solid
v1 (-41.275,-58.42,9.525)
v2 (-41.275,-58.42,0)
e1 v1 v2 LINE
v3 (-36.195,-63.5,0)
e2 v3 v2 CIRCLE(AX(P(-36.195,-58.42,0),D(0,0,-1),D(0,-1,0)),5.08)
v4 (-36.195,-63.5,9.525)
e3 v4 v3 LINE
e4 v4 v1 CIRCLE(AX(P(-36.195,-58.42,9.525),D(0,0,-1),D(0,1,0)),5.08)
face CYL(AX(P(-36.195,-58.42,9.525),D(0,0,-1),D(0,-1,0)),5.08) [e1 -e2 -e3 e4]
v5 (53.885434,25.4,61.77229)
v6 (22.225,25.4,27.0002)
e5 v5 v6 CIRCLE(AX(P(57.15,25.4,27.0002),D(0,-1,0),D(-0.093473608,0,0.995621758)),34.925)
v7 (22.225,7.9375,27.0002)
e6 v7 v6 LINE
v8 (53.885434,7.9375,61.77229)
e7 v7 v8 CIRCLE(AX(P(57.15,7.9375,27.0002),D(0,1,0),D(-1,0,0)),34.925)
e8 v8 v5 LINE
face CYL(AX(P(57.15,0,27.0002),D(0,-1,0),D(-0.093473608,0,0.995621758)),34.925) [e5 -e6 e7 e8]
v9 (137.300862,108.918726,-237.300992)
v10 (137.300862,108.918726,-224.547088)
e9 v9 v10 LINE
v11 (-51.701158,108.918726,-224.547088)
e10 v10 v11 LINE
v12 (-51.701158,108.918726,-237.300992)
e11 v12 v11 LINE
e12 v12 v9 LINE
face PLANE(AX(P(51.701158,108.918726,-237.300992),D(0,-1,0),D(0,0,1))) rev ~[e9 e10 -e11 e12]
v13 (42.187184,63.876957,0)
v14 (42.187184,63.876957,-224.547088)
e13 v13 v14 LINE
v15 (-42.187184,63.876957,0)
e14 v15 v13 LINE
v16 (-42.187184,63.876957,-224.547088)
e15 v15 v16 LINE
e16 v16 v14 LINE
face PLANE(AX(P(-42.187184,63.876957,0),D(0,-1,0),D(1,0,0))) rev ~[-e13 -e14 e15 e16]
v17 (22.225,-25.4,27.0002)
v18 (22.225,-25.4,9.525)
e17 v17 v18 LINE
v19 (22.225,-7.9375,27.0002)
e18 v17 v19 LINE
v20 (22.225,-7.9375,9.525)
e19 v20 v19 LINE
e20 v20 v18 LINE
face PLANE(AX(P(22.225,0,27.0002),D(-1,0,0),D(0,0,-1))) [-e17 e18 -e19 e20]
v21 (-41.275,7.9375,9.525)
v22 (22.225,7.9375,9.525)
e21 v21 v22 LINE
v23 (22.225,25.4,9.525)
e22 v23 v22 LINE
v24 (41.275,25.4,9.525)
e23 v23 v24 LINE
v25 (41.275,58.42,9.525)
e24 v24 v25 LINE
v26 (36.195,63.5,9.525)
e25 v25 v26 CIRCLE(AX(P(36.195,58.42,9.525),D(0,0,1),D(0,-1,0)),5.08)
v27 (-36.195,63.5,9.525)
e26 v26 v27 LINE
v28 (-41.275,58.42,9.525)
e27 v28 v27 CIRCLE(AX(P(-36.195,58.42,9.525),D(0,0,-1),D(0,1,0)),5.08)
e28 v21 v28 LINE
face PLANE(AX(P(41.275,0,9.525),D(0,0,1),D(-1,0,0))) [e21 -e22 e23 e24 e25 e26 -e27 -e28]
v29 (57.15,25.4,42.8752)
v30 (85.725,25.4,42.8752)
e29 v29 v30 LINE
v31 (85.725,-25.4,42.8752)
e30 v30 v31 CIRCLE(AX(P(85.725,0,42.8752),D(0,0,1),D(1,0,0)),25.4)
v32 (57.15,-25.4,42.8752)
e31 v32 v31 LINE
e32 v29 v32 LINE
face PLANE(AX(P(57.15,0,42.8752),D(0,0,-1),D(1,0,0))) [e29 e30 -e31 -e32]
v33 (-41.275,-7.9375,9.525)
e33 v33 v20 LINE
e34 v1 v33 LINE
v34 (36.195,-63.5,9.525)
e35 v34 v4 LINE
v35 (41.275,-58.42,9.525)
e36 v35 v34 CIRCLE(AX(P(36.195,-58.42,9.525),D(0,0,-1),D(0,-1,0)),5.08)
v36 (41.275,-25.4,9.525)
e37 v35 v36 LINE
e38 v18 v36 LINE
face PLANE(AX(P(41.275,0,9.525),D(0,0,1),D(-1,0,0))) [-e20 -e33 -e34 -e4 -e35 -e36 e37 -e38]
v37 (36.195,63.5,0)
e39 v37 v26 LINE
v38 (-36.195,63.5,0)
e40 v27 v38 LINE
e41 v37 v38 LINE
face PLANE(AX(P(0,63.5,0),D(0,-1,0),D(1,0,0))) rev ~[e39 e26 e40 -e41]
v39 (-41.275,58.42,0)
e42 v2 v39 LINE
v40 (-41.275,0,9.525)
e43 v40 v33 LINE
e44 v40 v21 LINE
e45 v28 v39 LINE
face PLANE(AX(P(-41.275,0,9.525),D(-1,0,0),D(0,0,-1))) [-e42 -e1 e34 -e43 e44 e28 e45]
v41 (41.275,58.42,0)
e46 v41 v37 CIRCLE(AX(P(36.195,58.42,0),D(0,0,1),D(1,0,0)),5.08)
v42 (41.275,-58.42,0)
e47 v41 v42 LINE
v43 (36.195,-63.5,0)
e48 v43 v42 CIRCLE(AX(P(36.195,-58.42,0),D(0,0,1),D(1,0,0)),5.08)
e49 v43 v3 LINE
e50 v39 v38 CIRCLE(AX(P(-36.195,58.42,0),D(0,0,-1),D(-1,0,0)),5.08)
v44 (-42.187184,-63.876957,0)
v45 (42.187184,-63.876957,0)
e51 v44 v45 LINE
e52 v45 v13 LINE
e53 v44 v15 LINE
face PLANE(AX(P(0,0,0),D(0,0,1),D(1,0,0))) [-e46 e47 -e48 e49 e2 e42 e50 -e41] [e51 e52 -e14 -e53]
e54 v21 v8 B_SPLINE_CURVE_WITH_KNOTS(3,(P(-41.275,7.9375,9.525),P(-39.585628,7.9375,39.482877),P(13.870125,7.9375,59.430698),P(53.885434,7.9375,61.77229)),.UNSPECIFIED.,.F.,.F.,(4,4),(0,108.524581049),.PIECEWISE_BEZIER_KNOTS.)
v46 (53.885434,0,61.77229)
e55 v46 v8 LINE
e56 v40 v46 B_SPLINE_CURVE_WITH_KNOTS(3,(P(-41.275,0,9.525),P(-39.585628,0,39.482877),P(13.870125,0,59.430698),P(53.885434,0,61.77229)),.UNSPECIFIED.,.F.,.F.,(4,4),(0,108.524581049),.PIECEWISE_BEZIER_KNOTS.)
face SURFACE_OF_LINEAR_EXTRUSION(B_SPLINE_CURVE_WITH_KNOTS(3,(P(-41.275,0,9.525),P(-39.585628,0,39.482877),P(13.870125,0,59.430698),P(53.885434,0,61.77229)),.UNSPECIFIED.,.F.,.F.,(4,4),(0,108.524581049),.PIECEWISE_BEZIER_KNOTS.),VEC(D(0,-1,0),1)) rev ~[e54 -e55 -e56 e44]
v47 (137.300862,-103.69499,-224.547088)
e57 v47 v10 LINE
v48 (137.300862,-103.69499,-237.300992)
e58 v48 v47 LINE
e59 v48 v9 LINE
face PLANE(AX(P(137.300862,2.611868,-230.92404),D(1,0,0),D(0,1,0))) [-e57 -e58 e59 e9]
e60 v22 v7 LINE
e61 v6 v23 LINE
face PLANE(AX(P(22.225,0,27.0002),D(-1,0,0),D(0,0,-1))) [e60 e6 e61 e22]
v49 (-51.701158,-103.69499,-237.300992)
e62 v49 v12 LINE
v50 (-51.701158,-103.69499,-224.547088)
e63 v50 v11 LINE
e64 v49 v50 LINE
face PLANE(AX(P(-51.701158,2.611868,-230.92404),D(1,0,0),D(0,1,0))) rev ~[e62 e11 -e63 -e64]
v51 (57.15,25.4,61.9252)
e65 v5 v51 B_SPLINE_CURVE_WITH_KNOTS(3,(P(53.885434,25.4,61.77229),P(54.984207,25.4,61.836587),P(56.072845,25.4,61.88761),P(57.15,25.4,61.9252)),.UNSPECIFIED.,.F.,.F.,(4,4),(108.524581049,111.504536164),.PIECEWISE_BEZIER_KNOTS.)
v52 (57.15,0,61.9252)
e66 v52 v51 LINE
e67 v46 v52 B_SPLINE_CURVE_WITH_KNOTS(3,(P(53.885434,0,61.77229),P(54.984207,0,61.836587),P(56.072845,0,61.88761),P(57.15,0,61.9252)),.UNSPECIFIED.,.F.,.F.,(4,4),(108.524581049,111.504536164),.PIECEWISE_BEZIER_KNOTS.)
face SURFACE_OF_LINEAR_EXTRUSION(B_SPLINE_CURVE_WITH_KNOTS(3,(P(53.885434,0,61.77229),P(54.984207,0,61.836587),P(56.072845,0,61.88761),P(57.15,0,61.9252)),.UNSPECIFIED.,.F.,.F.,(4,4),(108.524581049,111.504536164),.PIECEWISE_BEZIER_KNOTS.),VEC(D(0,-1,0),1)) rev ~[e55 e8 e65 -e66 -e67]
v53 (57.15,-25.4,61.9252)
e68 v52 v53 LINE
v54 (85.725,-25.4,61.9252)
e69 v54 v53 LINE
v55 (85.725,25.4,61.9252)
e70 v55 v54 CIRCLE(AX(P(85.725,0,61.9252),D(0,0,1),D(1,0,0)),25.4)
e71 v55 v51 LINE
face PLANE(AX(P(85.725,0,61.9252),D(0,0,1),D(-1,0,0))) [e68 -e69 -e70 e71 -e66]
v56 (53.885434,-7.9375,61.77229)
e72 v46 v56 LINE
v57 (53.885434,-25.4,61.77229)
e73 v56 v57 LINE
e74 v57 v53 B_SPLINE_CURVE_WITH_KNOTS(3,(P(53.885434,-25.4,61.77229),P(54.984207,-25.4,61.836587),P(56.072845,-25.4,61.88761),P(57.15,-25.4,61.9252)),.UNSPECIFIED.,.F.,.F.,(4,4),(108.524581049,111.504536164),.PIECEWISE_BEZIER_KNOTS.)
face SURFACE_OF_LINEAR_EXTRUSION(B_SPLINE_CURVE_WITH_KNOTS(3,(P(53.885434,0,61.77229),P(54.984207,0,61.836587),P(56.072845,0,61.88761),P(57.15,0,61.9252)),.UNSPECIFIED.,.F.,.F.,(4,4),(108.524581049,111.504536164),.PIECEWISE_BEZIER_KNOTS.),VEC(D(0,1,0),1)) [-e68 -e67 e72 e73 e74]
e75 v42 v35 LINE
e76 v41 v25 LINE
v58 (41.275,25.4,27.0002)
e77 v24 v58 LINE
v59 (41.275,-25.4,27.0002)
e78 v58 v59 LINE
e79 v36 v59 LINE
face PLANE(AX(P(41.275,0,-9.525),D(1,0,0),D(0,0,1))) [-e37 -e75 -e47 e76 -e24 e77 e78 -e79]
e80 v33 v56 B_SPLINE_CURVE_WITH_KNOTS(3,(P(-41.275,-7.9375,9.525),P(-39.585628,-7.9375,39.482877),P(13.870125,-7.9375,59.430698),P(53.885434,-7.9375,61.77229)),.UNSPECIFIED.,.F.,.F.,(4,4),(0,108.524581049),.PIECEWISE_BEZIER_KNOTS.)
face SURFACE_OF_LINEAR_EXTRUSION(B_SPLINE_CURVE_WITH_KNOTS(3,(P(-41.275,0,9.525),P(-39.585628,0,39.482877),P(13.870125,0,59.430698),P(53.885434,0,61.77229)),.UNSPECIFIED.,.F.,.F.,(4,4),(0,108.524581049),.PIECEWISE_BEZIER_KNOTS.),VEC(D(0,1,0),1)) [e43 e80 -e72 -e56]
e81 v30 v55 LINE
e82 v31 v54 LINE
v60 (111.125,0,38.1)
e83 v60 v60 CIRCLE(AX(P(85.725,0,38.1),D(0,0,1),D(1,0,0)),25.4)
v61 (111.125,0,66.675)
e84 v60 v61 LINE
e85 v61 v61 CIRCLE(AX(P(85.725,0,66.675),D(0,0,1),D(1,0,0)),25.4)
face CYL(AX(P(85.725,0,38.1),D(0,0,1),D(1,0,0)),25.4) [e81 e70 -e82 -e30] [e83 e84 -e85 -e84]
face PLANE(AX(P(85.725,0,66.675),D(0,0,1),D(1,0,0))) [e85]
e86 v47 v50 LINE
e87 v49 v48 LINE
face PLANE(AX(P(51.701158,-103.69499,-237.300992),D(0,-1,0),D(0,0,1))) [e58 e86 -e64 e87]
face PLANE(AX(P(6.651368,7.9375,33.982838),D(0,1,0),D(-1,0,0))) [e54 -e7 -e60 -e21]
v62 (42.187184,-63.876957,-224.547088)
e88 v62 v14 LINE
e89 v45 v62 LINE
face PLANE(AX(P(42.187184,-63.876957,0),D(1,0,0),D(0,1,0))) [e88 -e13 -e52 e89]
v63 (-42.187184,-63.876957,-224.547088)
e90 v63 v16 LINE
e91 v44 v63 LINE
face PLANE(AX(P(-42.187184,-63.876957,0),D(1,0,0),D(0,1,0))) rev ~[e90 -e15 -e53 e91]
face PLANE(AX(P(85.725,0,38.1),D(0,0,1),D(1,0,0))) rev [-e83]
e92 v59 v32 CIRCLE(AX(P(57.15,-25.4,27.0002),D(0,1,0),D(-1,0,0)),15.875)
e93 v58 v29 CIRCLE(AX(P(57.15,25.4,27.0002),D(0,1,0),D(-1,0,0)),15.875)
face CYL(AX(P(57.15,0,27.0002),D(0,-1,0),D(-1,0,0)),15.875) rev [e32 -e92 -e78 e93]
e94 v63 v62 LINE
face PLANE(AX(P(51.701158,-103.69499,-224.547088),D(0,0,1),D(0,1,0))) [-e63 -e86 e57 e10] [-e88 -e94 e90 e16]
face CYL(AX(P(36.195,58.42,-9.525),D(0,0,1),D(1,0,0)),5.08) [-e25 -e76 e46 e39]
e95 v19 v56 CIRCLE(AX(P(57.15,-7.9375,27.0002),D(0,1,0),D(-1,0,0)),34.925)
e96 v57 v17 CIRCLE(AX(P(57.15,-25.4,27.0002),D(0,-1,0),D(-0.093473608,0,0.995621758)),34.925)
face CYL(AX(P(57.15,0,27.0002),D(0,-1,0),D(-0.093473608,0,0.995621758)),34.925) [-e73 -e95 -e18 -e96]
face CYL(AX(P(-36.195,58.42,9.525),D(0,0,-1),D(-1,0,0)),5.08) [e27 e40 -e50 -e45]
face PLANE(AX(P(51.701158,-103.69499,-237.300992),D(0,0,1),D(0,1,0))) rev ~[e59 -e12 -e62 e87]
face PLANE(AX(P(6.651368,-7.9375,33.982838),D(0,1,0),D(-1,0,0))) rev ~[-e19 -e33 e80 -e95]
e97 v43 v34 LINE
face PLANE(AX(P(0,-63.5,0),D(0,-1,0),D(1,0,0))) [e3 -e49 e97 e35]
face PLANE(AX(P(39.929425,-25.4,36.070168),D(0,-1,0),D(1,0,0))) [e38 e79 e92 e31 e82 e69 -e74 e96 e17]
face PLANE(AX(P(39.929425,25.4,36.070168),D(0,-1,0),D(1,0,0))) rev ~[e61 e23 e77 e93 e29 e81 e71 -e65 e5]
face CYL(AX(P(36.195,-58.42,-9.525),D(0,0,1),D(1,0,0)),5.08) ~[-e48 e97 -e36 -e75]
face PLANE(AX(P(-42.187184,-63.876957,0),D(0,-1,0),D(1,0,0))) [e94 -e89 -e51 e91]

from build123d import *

# Parameters (mm, degrees)
F1_DEPTH  = 63.5
F0_W      = 25.4
F0_H      = 19.05
F2_DEPTH  = 25.4
F3_DEPTH  = 7.9375
F5_R      = 5.08
F6_W      = 84.3743681908
F6_H      = 127.7539134026
F7_DEPTH  = 229.7079414129
F8_W      = 212.6137167215
F8_H      = 12.7539038658
F9_DEPTH  = 51.7011582851
F10_DEPTH = 85.5997037143


# Not quite as in the source:
# - the program builds the solid bodies; features that only make, move or delete a surface that nothing else refers to are left out


with BuildPart() as f1:
    # F0 (on Front) → F1 (new body, symmetric)
    with BuildSketch(Plane.XZ):
        Polygon((22.225, 9.525), (-41.275, 9.525), (-41.275, -9.525), (41.275, -9.525), (41.275, 9.525), align=None)
    extrude(amount=F1_DEPTH, both=True)

    # F0 (on Front) → F2 (join, symmetric)
    with BuildSketch(Plane.XZ):
        with BuildLine():
            Line((22.225, 27.0002), (22.225, 9.525))
            Line((22.225, 9.525), (41.275, 9.525))
            Line((41.275, 9.525), (41.275, 27.0002))
            ThreePointArc((41.275, 27.0002), (45.9246798487, 38.2255201513), (57.15, 42.8752))
            Line((57.15, 42.8752), (60.325, 42.8752))
            Line((60.325, 42.8752), (60.325, 61.9252))
            Line((60.325, 61.9252), (57.15, 61.9252))
            add(Edge.make_bspline(
                [(53.8854342407, 61.7722898912), (54.9842067368, 61.8365871986), (56.0728453275, 61.8876096574), (57.15, 61.9252)],
                knots=[108.5245810491, 108.5245810491, 108.5245810491, 108.5245810491, 111.5045361635, 111.5045361635, 111.5045361635, 111.5045361635], degree=3))
            ThreePointArc((53.8854342407, 61.7722898912), (31.3258777096, 50.5133948686), (22.225, 27.0002))
        make_face()
        with Locations((73.025, 52.4002)):
            Rectangle(F0_W, F0_H)
    extrude(amount=F2_DEPTH, both=True)

    # F0 (on Front) → F3 (join, symmetric)
    with BuildSketch(Plane.XZ):
        with BuildLine():
            add(Edge.make_bspline(
                [(-41.275, 9.525), (-39.5856284224, 39.4828766469), (13.870125209, 59.4306981306), (53.8854342407, 61.7722898912)],
                knots=[0, 0, 0, 0, 108.5245810491, 108.5245810491, 108.5245810491, 108.5245810491], degree=3))
            Line((-41.275, 9.525), (22.225, 9.525))
            Line((22.225, 9.525), (22.225, 27.0002))
            ThreePointArc((22.225, 27.0002), (31.3258777096, 50.5133948686), (53.8854342407, 61.7722898912))
        make_face()
    extrude(amount=F3_DEPTH, both=True)

    # F0 (on Front) → F4 (revolve)
    with BuildSketch(Plane.XZ):
        Polygon((85.725, 66.675), (85.725, 61.9252), (85.725, 42.8752), (85.725, 38.1), (111.125, 38.1), (111.125, 66.675), align=None)
    revolve(axis=Axis((85.725, 0, 52.3875), (0, 0, 1)))

    # F5
    f5_edges = [f1.edges().sort_by_distance(p)[0] for p in [
        (41.275, -63.5, 0),
        (-41.275, -63.5, 0),
        (41.275, 63.5, 0),
        (-41.275, 63.5, 0),
    ]]
    fillet(f5_edges, radius=F5_R)

    # F6 (on Top) → F7 (join)
    with BuildSketch(Plane.XY):
        Rectangle(F6_W, F6_H)
    extrude(amount=-F7_DEPTH)

    # F8 (on Right) → F9 (join, symmetric)
    with BuildSketch(Plane.YZ):
        with Locations((2.6118680835, -230.9240400791)):
            Rectangle(F8_W, F8_H)
    extrude(amount=F9_DEPTH, both=True)

    # F10 (add): a face of the model
    f10_faces = [f1.faces().sort_by_distance(p)[0] for p in [
        (51.7011582851, 2.6118680835, -230.9240400791),
    ]]
    extrude(f10_faces, amount=F10_DEPTH)


solid = f1.part
